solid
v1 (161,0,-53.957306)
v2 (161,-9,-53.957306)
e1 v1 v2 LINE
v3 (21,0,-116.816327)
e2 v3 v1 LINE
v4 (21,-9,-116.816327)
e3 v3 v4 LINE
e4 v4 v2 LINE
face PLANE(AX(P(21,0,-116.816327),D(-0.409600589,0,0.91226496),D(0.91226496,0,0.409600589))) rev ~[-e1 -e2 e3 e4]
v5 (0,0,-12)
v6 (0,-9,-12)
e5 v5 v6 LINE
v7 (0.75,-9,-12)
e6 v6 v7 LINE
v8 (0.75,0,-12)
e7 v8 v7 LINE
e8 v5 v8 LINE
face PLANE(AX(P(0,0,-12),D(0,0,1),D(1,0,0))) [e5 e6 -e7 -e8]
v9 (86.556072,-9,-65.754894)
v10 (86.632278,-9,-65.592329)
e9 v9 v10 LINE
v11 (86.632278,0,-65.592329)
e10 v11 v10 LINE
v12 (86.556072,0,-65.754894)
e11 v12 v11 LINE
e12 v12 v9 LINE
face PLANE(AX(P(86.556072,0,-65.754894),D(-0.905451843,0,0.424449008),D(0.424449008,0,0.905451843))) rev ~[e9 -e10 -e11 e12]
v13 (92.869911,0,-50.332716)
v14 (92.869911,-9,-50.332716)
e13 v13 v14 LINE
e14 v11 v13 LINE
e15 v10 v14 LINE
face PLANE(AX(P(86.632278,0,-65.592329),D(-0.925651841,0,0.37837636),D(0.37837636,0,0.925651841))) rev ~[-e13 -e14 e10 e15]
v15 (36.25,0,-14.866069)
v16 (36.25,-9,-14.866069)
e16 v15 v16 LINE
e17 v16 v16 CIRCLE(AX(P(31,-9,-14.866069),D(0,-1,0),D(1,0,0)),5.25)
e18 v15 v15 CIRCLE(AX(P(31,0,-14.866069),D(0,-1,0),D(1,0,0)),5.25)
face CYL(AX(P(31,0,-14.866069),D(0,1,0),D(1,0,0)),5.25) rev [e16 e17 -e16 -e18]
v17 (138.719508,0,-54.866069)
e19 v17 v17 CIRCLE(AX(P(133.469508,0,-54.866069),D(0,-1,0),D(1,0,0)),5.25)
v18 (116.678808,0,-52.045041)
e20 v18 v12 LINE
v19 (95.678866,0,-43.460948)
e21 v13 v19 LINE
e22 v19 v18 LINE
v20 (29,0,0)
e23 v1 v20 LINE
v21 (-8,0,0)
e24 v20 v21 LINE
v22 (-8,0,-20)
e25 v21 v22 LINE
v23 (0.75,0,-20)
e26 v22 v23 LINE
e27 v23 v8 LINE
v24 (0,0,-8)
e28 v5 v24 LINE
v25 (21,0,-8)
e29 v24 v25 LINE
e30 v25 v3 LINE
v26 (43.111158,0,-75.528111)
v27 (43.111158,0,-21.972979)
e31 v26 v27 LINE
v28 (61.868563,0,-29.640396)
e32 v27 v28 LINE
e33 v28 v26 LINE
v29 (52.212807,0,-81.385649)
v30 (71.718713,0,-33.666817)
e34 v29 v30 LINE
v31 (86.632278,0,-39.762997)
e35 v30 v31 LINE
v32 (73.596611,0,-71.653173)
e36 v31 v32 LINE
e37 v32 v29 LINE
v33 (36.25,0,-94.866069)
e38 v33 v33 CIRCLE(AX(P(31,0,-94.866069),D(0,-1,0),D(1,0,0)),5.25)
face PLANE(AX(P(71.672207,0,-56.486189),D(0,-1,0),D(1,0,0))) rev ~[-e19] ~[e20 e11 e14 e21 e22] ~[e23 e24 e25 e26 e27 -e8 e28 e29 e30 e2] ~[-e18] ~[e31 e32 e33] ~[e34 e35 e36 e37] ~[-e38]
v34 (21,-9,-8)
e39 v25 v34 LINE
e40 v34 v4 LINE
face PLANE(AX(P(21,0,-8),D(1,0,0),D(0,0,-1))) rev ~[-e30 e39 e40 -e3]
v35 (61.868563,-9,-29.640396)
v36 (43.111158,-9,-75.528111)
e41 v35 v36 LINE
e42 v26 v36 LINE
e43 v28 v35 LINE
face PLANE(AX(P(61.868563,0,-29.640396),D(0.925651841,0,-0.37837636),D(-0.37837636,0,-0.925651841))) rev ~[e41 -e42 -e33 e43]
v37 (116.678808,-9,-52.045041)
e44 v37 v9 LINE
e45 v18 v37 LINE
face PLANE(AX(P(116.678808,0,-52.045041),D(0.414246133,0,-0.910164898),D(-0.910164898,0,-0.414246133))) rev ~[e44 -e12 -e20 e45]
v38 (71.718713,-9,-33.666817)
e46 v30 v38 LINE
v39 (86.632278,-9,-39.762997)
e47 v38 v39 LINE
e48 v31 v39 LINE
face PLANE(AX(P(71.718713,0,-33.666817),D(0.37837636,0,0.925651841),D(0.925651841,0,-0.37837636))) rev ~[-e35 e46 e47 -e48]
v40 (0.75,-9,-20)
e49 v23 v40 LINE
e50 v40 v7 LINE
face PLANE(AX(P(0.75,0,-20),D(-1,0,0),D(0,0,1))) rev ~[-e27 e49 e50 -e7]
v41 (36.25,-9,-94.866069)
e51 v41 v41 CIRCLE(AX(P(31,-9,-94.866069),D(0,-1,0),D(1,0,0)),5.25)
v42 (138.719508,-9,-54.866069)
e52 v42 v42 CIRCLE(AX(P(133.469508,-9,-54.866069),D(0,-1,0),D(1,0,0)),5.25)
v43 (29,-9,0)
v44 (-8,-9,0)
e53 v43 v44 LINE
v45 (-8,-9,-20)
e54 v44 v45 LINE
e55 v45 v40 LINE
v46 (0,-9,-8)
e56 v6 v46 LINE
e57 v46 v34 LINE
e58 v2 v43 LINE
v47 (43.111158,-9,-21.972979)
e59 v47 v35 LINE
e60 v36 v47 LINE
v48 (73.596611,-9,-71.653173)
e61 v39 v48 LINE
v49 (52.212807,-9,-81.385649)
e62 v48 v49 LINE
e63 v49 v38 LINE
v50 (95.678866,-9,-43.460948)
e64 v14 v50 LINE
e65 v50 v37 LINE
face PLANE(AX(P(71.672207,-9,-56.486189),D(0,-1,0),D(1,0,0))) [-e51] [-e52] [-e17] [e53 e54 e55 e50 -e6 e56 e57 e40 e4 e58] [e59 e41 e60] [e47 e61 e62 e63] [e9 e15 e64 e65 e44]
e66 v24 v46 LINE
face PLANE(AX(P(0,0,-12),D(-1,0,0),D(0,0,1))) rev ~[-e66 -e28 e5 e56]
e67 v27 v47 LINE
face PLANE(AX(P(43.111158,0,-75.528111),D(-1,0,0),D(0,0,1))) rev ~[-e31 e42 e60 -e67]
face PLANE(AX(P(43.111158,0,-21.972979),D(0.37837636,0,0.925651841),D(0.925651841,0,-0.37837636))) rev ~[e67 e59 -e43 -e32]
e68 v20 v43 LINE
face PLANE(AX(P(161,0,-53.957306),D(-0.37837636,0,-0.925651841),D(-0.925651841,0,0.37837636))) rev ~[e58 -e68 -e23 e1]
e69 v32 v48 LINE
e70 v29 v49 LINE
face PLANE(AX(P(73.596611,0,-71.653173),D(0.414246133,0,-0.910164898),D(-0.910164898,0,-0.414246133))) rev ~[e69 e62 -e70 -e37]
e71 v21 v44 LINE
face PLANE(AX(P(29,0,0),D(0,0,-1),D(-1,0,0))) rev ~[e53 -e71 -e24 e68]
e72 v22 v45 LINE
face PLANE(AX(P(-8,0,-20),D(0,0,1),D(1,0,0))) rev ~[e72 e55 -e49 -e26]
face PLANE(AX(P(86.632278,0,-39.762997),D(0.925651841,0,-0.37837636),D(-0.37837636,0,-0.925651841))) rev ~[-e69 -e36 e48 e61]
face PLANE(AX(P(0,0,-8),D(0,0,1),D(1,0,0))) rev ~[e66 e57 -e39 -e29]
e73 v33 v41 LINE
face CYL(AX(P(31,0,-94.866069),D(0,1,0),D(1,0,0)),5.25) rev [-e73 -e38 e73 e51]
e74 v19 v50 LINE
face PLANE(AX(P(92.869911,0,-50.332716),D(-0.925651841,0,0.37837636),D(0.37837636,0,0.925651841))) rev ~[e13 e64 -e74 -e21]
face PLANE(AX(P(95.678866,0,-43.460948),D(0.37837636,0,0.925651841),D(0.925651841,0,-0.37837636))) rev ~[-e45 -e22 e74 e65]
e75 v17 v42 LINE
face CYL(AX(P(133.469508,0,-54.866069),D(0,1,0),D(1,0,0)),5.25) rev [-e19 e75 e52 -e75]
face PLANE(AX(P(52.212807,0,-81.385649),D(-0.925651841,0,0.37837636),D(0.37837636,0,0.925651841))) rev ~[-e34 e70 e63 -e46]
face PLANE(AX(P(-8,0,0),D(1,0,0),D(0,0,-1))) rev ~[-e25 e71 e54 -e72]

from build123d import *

# Parameters (mm, degrees)
F0_R     = 5.25
F0_W     = 0.75
F0_H     = 8
F1_DEPTH = 9


# Not quite as in the source:
# - a feature names something its author has since deleted; it is built from what else it names


with BuildPart() as f1:
    # F0 (on Front) → F1 (new body)
    with BuildSketch(Plane.XZ):
        Polygon((29, 0), (21, 0), (21, -8), (21, -109.6278309861), (21, -116.8163269758), (161, -53.9573058486), align=None)
        with Locations((31, -94.8660687473)):
            Circle(F0_R, mode=Mode.SUBTRACT)
        with Locations((31, -14.8660687473)):
            Circle(F0_R, mode=Mode.SUBTRACT)
        Polygon((43.1111576917, -75.528110744), (43.1111576917, -21.972979021), (61.8685626933, -29.6403959801), (71.7187130056, -33.6668169881), (86.6322777796, -39.7629971078), (95.6788662869, -43.460948191), (116.6788079217, -52.0450411727), (86.5560721122, -65.7548940175), (73.5966112911, -71.6531730426), (52.2128066716, -81.3856494169), (43.1111576917, -85.528110744), align=None, mode=Mode.SUBTRACT)
        with Locations((133.4695076596, -54.8660687473)):
            Circle(F0_R, mode=Mode.SUBTRACT)
        Polygon((71.7187130056, -33.6668169881), (61.8685626933, -29.6403959801), (43.1111576917, -75.528110744), (43.1111576917, -85.528110744), (52.2128066716, -81.3856494169), align=None)
        Polygon((21, -8), (21, 0), (-8, 0), (-8, -20), (0, -20), (0, -12), (0, -8), align=None)
        with Locations((0.375, -16)):
            Rectangle(F0_W, F0_H)
        Polygon((95.6788662869, -43.460948191), (86.6322777796, -39.7629971078), (73.5966112911, -71.6531730426), (86.5560721122, -65.7548940175), (86.6322777796, -65.5923289964), (92.8699112608, -50.3327157415), align=None)
    extrude(amount=F1_DEPTH)


solid = f1.part
